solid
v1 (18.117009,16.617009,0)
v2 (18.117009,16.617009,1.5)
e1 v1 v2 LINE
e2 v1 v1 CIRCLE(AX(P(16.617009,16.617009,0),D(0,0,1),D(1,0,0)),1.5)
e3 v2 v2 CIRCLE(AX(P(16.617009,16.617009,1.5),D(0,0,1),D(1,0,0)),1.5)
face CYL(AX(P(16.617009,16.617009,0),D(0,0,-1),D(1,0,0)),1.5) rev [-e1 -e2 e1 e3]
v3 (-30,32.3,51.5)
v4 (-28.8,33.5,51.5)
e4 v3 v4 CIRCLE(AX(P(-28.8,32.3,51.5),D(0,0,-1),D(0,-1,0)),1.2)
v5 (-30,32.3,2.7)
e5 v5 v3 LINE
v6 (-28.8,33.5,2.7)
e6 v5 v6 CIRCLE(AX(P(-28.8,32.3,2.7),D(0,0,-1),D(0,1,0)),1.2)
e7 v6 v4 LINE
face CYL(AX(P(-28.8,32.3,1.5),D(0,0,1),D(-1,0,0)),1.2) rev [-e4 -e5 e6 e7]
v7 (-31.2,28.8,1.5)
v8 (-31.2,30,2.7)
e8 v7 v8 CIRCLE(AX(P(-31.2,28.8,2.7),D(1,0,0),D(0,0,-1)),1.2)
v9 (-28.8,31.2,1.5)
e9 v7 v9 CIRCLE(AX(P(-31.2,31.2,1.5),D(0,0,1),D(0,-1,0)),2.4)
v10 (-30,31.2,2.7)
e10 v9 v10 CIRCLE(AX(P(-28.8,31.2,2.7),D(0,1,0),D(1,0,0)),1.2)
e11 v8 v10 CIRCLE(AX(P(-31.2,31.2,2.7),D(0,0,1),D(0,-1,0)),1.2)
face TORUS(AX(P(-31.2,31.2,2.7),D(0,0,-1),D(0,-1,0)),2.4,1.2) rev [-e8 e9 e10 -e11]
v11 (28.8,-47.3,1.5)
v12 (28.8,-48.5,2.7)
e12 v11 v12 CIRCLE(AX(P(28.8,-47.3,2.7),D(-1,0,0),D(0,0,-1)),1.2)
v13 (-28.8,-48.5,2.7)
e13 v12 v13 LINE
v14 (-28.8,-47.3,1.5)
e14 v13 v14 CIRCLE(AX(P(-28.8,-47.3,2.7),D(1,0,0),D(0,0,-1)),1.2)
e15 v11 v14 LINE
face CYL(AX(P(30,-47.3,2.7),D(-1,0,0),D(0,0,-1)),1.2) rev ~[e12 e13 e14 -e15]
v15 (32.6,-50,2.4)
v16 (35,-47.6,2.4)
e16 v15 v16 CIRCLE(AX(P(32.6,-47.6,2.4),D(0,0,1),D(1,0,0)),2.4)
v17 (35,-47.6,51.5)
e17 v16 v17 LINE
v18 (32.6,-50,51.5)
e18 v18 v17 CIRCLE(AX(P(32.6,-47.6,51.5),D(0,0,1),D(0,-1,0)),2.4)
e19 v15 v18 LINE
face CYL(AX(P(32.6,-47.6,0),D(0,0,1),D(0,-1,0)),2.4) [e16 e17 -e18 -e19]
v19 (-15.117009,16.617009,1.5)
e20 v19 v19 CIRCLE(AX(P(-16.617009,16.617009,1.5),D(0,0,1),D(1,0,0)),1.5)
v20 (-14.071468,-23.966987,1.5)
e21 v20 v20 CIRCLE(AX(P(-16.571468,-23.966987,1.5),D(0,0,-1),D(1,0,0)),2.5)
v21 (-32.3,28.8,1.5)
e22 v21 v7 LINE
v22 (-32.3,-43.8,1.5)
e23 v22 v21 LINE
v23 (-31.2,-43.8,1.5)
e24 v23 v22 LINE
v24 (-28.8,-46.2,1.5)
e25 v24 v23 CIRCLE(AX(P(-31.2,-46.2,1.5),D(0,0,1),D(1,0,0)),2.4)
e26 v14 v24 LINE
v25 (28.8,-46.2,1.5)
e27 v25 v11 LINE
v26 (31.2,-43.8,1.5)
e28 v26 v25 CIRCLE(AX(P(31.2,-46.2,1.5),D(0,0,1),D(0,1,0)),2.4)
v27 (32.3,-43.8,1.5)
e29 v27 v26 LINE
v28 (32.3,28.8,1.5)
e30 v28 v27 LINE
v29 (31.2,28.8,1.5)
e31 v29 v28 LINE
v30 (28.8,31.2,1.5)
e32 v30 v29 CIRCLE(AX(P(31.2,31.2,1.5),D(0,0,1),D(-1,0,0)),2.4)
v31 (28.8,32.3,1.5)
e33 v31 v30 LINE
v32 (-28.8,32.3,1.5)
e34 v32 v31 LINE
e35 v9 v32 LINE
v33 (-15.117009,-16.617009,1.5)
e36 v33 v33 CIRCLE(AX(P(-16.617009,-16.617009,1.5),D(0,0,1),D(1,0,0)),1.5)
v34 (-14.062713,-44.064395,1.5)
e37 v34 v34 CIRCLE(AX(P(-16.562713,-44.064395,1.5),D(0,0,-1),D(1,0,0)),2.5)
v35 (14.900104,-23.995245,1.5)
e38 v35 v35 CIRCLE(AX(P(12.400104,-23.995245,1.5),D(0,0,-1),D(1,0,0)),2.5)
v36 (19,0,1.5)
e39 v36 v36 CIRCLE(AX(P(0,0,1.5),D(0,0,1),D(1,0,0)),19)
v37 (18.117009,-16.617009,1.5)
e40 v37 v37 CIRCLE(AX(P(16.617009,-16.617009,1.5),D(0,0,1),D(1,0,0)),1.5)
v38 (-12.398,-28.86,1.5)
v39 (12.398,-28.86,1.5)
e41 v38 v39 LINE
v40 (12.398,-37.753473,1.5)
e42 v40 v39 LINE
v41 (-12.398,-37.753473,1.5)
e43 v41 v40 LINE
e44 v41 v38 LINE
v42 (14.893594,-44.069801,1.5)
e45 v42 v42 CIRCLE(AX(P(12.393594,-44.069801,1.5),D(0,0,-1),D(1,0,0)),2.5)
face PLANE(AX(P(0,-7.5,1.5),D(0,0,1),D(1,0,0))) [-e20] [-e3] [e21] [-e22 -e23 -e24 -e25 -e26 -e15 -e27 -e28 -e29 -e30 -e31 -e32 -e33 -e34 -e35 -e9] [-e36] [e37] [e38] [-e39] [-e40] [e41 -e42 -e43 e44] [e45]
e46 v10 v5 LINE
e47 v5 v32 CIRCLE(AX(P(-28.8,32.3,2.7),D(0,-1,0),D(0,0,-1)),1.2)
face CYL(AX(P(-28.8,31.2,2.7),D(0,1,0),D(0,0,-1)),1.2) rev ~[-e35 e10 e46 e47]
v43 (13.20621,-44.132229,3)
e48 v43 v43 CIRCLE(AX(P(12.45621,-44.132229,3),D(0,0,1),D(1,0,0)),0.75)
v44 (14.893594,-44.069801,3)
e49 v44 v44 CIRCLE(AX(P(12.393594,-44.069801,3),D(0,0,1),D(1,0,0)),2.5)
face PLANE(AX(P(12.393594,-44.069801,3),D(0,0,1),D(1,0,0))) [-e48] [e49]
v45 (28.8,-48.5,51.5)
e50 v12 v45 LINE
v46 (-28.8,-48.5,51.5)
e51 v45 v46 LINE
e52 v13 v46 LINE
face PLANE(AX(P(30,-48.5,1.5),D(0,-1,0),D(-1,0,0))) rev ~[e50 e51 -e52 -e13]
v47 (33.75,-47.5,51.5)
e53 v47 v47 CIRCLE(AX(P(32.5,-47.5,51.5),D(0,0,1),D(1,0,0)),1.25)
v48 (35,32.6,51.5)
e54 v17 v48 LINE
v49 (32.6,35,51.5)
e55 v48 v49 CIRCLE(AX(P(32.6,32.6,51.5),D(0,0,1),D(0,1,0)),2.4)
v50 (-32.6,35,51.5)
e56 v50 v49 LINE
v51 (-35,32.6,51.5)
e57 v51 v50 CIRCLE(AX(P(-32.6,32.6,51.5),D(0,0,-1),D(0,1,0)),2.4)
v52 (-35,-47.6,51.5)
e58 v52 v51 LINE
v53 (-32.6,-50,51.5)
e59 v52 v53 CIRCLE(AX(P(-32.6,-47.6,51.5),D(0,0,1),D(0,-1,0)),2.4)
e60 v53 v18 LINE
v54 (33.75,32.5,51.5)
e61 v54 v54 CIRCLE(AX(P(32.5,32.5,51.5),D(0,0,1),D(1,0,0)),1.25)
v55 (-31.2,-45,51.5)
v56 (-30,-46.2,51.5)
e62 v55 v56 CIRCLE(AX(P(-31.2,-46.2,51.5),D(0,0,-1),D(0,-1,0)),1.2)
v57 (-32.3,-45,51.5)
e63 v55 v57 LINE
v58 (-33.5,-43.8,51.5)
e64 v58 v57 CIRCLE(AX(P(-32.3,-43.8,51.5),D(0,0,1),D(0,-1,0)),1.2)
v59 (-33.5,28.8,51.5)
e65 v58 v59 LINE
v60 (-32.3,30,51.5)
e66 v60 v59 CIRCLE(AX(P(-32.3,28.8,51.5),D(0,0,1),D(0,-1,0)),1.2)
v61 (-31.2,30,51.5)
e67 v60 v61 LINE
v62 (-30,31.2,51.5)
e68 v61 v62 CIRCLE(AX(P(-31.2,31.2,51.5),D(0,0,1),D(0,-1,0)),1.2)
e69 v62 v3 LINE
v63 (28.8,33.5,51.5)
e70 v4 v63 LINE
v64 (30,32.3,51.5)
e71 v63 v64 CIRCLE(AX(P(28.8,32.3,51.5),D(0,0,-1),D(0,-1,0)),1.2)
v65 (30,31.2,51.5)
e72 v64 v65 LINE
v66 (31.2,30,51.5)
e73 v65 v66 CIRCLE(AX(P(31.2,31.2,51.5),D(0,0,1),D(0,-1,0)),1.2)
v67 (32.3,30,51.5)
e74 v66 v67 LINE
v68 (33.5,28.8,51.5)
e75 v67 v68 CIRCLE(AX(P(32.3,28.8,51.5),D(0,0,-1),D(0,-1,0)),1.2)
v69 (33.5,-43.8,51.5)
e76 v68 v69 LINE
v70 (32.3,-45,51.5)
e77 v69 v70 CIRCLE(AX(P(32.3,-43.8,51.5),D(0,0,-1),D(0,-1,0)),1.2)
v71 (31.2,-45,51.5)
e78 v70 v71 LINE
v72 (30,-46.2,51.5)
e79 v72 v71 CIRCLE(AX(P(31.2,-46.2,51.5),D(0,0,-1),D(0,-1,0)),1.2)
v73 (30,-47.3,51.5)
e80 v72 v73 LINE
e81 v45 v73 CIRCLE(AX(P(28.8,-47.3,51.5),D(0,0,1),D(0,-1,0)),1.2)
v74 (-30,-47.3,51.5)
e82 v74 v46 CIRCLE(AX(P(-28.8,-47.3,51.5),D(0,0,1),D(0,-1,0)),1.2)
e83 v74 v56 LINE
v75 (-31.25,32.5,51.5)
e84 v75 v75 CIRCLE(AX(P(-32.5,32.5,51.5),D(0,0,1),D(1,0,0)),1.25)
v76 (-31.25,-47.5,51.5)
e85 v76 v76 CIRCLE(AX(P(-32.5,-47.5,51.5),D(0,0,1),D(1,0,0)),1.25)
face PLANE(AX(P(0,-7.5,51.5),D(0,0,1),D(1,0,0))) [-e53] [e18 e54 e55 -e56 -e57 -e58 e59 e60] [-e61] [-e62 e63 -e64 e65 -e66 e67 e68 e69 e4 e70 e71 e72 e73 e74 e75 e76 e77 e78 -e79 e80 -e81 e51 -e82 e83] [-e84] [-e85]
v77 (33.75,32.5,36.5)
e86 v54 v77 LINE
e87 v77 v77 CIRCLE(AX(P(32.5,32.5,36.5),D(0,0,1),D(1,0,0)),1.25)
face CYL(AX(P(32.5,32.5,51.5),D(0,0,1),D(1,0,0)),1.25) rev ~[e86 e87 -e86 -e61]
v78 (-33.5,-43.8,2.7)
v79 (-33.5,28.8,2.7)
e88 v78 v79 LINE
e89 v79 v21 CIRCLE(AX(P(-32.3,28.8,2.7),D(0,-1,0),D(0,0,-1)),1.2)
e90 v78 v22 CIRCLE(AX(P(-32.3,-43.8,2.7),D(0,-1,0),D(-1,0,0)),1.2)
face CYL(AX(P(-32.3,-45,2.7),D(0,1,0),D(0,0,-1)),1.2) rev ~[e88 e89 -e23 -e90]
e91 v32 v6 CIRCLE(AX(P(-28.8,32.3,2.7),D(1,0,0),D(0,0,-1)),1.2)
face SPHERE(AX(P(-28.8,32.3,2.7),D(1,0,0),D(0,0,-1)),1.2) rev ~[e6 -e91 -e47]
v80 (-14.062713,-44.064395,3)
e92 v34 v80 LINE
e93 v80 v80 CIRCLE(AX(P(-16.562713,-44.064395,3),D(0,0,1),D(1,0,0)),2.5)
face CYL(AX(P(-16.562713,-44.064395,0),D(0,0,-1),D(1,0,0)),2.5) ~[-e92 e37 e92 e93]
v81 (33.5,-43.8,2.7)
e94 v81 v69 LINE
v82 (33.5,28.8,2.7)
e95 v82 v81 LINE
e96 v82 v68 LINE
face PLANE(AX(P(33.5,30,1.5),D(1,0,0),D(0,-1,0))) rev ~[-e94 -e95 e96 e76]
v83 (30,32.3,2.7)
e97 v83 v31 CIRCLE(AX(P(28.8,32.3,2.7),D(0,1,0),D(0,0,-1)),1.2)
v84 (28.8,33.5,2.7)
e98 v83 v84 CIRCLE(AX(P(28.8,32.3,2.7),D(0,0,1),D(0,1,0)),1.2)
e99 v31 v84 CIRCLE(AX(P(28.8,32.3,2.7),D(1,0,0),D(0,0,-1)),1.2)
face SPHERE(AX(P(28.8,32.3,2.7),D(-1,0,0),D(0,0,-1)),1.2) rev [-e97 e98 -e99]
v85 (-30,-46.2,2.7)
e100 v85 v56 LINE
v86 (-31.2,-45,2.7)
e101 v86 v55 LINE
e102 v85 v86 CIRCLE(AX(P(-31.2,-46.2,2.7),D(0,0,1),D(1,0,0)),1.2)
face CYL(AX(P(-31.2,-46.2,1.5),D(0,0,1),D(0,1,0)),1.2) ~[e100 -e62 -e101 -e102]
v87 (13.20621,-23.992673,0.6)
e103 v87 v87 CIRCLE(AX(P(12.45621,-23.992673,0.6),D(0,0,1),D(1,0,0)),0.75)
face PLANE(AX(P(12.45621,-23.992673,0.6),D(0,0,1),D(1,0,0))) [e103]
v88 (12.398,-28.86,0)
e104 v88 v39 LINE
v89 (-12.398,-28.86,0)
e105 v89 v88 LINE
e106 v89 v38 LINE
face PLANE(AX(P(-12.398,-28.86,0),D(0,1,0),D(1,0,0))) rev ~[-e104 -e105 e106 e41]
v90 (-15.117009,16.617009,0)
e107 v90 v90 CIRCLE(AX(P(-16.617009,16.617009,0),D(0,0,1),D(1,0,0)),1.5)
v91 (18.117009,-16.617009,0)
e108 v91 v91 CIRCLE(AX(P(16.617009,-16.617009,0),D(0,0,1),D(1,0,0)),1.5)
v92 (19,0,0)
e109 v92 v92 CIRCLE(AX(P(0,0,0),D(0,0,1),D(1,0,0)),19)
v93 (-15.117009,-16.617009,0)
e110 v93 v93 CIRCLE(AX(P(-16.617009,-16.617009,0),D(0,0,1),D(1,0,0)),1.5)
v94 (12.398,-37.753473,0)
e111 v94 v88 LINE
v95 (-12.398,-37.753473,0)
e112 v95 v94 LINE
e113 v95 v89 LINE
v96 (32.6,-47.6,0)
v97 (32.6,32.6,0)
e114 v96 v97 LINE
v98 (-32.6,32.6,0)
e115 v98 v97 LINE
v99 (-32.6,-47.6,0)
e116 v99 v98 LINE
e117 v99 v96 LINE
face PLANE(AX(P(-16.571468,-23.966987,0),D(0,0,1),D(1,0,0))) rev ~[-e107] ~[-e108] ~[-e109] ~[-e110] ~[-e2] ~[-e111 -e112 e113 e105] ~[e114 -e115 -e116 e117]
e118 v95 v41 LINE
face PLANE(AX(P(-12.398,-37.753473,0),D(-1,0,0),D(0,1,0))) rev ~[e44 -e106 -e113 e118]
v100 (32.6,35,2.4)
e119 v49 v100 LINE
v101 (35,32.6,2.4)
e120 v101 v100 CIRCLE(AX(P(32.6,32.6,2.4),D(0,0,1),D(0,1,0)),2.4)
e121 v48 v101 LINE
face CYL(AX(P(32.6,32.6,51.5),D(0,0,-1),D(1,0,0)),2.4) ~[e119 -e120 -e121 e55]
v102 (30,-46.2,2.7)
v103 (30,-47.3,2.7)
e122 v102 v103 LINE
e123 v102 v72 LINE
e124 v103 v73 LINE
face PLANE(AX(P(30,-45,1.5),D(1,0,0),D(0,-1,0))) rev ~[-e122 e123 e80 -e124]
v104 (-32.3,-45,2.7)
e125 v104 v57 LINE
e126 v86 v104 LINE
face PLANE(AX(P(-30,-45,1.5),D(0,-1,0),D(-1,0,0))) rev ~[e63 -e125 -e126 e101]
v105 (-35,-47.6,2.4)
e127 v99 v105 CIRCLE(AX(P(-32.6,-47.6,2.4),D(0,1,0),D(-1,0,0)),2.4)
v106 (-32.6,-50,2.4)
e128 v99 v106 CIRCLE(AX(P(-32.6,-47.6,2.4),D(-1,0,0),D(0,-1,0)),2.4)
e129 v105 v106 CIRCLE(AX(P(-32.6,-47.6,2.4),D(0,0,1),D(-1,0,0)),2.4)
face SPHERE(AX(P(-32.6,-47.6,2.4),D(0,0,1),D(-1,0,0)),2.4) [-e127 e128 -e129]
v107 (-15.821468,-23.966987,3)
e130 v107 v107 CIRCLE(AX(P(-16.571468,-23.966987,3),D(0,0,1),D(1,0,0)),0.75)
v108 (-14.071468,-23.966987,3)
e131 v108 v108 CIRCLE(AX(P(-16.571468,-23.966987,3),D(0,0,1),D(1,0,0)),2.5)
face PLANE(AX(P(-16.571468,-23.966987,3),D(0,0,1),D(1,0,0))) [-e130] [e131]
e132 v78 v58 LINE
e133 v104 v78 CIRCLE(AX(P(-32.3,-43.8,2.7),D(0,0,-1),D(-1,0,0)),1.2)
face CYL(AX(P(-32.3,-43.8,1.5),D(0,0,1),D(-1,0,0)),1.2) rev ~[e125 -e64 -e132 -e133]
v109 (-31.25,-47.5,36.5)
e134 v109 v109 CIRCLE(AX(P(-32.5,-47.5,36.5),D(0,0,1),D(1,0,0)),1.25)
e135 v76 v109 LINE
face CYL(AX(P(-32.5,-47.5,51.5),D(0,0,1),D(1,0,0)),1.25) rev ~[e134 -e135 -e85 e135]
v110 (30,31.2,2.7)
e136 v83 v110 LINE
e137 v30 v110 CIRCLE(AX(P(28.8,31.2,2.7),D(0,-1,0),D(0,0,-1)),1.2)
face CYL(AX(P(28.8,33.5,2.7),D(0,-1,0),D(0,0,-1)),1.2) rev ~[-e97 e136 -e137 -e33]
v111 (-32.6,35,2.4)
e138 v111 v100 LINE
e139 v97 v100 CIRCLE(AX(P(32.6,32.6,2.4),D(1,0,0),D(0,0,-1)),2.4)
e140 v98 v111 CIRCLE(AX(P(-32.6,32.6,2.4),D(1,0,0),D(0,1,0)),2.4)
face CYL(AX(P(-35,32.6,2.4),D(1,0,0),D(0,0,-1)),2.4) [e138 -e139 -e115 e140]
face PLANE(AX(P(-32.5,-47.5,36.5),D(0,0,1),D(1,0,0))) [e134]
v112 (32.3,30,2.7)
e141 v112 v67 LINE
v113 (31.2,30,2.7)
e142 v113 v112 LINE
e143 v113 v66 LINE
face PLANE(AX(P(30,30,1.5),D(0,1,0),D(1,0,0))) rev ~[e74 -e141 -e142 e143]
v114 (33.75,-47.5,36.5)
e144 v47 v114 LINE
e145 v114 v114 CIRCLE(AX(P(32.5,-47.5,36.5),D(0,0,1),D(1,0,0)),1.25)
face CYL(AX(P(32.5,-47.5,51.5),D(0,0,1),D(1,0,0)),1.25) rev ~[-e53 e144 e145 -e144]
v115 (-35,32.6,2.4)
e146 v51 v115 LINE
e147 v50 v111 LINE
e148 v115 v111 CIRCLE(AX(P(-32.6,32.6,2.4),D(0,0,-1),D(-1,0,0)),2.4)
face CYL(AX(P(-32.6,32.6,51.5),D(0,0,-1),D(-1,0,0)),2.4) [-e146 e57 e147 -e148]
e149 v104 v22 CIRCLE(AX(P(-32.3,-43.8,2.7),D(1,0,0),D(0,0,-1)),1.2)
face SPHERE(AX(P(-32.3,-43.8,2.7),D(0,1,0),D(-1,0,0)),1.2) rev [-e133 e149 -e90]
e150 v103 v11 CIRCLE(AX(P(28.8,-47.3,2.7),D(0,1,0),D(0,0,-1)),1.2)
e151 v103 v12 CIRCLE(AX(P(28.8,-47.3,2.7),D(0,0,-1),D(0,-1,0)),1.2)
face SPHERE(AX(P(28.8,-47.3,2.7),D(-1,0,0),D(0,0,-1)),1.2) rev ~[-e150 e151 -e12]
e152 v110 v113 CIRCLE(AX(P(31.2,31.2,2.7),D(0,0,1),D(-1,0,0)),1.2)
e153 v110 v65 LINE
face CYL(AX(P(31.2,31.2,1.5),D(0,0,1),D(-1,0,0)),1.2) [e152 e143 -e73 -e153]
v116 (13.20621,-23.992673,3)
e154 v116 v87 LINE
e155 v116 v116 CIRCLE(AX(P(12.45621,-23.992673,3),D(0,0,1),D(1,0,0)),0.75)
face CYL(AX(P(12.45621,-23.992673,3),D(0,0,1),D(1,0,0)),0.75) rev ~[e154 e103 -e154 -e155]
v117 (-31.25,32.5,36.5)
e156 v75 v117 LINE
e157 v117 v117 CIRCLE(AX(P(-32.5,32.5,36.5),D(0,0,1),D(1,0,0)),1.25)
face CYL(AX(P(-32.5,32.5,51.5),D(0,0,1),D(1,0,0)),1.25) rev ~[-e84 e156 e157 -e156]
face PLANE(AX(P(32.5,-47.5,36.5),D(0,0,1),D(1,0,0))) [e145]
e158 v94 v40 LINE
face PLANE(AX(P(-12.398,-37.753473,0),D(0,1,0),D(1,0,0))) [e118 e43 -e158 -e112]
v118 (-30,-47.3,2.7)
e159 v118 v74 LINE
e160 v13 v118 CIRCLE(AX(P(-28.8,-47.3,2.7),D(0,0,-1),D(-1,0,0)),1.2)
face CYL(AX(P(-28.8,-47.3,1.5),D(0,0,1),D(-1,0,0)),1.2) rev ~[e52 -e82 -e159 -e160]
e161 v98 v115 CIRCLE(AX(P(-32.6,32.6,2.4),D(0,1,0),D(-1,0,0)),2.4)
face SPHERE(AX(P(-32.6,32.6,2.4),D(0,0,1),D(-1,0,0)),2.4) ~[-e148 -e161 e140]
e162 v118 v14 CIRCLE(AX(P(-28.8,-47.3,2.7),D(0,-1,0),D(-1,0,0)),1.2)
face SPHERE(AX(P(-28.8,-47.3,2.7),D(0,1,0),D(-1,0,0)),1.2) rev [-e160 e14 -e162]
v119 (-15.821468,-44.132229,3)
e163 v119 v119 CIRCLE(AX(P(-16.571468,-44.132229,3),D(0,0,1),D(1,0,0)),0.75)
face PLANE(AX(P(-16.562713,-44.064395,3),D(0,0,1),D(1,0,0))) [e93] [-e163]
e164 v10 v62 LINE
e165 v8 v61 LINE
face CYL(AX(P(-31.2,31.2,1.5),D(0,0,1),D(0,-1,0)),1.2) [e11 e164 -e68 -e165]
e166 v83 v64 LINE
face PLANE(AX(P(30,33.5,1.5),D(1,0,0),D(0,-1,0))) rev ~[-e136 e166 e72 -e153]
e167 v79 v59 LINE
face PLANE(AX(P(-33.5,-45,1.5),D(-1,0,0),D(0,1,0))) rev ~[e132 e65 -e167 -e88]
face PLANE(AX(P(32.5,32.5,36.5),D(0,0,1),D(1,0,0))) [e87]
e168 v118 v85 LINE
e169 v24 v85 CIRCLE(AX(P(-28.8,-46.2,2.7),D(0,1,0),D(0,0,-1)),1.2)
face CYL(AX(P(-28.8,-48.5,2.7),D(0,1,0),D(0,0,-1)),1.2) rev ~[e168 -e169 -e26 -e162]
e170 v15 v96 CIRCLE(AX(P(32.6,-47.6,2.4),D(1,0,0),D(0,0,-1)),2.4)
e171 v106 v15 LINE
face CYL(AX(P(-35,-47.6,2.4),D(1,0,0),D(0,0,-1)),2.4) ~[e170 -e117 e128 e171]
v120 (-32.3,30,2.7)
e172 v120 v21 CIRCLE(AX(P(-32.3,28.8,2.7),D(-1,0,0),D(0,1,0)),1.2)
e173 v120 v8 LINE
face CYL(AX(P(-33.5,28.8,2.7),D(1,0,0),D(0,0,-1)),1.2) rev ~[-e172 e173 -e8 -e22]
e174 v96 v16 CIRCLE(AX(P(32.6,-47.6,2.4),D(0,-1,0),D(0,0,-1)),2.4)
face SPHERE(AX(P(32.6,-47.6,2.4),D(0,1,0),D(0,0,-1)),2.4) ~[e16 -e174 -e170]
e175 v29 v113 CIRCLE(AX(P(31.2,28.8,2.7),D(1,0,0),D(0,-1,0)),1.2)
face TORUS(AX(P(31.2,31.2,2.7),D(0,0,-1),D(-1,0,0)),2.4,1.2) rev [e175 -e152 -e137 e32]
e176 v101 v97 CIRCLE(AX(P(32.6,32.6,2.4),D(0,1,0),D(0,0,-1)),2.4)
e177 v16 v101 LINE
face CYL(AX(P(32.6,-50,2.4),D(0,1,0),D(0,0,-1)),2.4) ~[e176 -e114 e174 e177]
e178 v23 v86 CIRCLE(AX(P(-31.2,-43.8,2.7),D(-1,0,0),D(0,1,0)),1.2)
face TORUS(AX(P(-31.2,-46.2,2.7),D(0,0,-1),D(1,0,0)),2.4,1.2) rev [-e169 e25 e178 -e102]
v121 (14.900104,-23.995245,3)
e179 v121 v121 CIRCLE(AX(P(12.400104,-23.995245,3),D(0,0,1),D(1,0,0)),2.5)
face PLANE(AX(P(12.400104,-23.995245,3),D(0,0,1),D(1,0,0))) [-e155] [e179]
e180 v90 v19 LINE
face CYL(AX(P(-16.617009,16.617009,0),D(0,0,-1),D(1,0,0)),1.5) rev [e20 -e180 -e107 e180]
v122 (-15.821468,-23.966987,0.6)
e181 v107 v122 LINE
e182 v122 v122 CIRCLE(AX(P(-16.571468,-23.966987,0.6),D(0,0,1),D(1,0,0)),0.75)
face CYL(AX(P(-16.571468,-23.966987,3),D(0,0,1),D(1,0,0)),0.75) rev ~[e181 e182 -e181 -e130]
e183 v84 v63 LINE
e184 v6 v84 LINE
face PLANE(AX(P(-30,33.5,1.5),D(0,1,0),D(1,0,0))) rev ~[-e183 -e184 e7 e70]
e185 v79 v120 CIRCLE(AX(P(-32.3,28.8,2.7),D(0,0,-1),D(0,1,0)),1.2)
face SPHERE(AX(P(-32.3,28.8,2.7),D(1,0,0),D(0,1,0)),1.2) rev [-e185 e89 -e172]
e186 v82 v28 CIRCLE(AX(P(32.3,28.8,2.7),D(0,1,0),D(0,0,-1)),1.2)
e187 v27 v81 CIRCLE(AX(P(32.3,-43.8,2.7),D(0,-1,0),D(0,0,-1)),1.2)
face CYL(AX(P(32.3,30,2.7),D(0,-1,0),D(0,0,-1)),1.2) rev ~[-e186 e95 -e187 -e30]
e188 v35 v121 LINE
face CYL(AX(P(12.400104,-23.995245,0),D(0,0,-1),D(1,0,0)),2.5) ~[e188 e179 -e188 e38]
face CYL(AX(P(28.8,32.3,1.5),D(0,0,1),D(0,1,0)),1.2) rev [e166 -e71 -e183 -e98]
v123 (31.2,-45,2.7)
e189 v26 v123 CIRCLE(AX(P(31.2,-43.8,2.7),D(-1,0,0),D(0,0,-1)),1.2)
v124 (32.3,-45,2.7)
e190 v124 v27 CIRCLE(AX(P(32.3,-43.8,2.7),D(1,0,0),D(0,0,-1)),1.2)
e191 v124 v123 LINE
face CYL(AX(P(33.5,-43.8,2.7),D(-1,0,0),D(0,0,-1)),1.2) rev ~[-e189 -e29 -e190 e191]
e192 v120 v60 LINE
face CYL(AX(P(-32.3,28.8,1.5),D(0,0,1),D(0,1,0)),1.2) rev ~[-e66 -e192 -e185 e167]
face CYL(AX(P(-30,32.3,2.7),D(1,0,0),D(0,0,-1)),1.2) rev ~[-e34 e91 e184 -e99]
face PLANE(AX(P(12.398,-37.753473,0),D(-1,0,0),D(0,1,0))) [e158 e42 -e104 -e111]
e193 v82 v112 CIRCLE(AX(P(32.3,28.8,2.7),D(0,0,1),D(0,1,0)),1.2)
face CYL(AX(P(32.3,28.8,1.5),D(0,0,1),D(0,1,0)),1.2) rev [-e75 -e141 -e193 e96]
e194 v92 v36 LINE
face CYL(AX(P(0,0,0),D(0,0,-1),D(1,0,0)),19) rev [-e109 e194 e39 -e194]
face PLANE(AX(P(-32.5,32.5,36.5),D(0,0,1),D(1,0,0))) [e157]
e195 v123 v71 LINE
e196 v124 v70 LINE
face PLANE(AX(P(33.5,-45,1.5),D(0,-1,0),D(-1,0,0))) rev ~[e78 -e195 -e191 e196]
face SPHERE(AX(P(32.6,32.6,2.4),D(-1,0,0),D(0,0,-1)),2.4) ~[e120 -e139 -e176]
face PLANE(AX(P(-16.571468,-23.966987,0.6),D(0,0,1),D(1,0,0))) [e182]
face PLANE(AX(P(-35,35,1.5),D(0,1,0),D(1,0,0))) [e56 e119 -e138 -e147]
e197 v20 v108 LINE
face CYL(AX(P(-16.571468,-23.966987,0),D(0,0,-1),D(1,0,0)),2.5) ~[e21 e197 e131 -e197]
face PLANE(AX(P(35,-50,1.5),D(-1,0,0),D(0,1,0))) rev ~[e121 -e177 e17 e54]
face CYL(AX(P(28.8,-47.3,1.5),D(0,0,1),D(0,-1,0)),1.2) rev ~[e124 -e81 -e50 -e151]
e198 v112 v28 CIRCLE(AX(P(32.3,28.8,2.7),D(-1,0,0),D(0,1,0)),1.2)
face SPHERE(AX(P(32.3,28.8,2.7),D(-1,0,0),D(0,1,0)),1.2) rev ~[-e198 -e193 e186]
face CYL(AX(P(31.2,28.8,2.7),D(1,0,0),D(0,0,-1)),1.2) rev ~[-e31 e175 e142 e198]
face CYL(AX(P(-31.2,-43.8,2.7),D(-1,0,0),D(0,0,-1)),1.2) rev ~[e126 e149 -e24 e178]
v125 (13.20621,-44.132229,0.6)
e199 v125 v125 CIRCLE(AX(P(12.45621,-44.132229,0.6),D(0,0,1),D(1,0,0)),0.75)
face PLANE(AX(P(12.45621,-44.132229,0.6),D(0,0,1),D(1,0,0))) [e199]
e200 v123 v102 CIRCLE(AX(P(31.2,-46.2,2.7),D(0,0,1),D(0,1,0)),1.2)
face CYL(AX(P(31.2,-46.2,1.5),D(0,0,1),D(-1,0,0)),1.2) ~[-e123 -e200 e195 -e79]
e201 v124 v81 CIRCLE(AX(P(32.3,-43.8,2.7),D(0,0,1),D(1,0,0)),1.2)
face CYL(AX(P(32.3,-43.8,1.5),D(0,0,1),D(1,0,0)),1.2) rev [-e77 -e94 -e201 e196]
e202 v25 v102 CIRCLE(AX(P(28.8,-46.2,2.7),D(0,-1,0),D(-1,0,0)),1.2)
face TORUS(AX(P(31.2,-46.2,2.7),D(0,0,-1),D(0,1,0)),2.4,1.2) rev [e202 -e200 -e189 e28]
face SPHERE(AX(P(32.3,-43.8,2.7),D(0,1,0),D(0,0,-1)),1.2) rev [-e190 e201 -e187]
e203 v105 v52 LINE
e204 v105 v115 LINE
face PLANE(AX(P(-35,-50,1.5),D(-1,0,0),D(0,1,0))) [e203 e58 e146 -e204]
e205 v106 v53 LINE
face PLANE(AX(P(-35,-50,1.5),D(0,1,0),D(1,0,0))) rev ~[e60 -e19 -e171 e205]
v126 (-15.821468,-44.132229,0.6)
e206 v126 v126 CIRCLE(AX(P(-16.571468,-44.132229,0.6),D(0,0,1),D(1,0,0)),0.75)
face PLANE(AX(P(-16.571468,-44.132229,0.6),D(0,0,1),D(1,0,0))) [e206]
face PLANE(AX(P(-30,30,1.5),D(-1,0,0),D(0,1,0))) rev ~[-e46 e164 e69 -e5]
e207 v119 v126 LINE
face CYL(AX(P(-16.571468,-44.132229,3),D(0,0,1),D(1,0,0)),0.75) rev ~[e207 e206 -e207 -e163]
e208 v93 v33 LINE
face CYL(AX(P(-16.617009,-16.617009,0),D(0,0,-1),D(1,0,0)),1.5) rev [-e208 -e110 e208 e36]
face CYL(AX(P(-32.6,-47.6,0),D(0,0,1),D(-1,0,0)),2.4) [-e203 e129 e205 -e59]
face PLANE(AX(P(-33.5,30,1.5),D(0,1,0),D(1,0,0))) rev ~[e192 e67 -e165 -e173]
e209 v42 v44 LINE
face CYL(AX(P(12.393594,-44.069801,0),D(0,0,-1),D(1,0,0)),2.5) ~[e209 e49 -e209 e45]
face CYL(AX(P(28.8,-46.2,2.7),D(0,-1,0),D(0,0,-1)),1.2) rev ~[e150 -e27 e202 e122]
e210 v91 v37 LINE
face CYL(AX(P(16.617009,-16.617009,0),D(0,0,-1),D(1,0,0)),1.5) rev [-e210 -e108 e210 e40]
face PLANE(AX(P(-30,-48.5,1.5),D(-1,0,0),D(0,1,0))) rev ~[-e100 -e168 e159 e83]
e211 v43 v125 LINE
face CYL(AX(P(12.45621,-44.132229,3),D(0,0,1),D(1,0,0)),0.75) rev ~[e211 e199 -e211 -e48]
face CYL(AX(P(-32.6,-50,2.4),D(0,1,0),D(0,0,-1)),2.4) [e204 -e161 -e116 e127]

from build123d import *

# Parameters (mm, degrees)
F0_W     = 70
F0_H     = 85
F0_R     = 1.5
F0_W_2   = 24.796
F0_H_2   = 8.8934727723
F0_R_2   = 19
F1_DEPTH = 1.5
F2_W     = 70
F2_H     = 85
F3_DEPTH = 50
F4_R     = 1.25
F5_DEPTH = 15
F6_R     = 2.5
F7_DEPTH = 3
F8_R     = 0.75
F9_DEPTH = 2.4
F10_R    = 2.4
F11_F1_R = 1.2
F11_F2_R = 1.2


with BuildPart() as f1:
    # F0 (on Top) → F1 (new body)
    with BuildSketch(Plane.XY):
        with Locations((0, -7.5)):
            Rectangle(F0_W, F0_H)
        with Locations((-16.6170093579, -16.6170093579)):
            Circle(F0_R, mode=Mode.SUBTRACT)
        with Locations((0, -33.3067363862)):
            Rectangle(F0_W_2, F0_H_2, mode=Mode.SUBTRACT)
        with Locations((16.6170093579, -16.6170093579)):
            Circle(F0_R, mode=Mode.SUBTRACT)
        with Locations((-16.6170093579, 16.6170093579)):
            Circle(F0_R, mode=Mode.SUBTRACT)
        Circle(F0_R_2, mode=Mode.SUBTRACT)
        with Locations((16.6170093579, 16.6170093579)):
            Circle(F0_R, mode=Mode.SUBTRACT)
    extrude(amount=F1_DEPTH)

    # F2 (on face) → F3 (join)
    with BuildSketch(Plane.XY.offset(1.5)):
        with Locations((0, -7.5)):
            Rectangle(F2_W, F2_H)
        Polygon((-30, 30), (-30, 33.5), (30, 33.5), (30, 30), (33.5, 30), (33.5, -45), (30, -45), (30, -48.5), (-30, -48.5), (-30, -45), (-33.5, -45), (-33.5, 30), align=None, mode=Mode.SUBTRACT)
    extrude(amount=F3_DEPTH)

    # F4 (on face) → F5 (cut)
    with BuildSketch(Plane.XY.offset(51.5)):
        with Locations((-32.5, 32.5)):
            Circle(F4_R)
        with Locations((32.5, -47.5)):
            Circle(F4_R)
        with Locations((32.5, 32.5)):
            Circle(F4_R)
        with Locations((-32.5, -47.5)):
            Circle(F4_R)
    extrude(amount=-F5_DEPTH, mode=Mode.SUBTRACT)

    # F6 (on face) → F7 (join)
    with BuildSketch(Plane.XY):
        with Locations((-16.5714677423, -23.966986686)):
            Circle(F6_R)
        with Locations((12.4001037329, -23.9952448756)):
            Circle(F6_R)
        with Locations((12.3935937881, -44.0698005259)):
            Circle(F6_R)
        with Locations((-16.5627133101, -44.0643951297)):
            Circle(F6_R)
    extrude(amount=F7_DEPTH)

    # F8 (on face) → F9 (cut)
    with BuildSketch(Plane.XY.offset(3)):
        with Locations((-16.5714677423, -23.966986686)):
            Circle(F8_R)
        with Locations((12.4562103301, -23.9926725626)):
            Circle(F8_R)
        with Locations((12.4562103301, -44.1322289407)):
            Circle(F8_R)
        with Locations((-16.5714677423, -44.1322289407)):
            Circle(F8_R)
    extrude(amount=-F9_DEPTH, mode=Mode.SUBTRACT)

    # F10
    f10_edges = [f1.edges().sort_by_distance(p)[0] for p in [
        (-35, 35, 25.75),
        (-35, -50, 25.75),
        (-35, -7.5, 0),
        (0, 35, 0),
        (35, -7.5, 0),
        (0, -50, 0),
        (35, 35, 25.75),
        (35, -50, 25.75),
    ]]
    fillet(f10_edges, radius=F10_R)

    # F11: fillet of radius 1.2 on 23 edges, made by hand

    # F11_f1
    f11_f1_edges = [f1.edges().sort_by_distance(p)[0] for p in [
        (-30, 30, 26.5),
        (30, 30, 26.5),
        (-30, -45, 26.5),
        (30, -45, 26.5),
    ]]
    fillet(f11_f1_edges, radius=F11_F1_R)

    # F11_f2
    f11_f2_edges = [f1.edges().sort_by_distance(p)[0] for p in [
        (0, 33.5, 1.5),
        (-30, 32.35, 1.5),
        (-32.35, 30, 1.5),
        (-30, 33.5, 26.5),
        (-33.5, 30, 26.5),
        (-33.5, -7.5, 1.5),
        (30, 32.35, 1.5),
        (32.35, 30, 1.5),
        (30, 33.5, 26.5),
        (33.5, 30, 26.5),
        (33.5, -7.5, 1.5),
        (-33.5, -45, 26.5),
        (-32.35, -45, 1.5),
        (-30, -48.5, 26.5),
        (0, -48.5, 1.5),
        (30, -47.35, 1.5),
        (32.35, -45, 1.5),
        (33.5, -45, 26.5),
        (30, -48.5, 26.5),
        (30.3514718626, -45.3514718626, 1.5),
        (-30.3514718626, -45.3514718626, 1.5),
        (30.3514718626, 30.3514718626, 1.5),
        (-30.3514718626, 30.3514718626, 1.5),
    ]]
    fillet(f11_f2_edges, radius=F11_F2_R)


solid = f1.part
